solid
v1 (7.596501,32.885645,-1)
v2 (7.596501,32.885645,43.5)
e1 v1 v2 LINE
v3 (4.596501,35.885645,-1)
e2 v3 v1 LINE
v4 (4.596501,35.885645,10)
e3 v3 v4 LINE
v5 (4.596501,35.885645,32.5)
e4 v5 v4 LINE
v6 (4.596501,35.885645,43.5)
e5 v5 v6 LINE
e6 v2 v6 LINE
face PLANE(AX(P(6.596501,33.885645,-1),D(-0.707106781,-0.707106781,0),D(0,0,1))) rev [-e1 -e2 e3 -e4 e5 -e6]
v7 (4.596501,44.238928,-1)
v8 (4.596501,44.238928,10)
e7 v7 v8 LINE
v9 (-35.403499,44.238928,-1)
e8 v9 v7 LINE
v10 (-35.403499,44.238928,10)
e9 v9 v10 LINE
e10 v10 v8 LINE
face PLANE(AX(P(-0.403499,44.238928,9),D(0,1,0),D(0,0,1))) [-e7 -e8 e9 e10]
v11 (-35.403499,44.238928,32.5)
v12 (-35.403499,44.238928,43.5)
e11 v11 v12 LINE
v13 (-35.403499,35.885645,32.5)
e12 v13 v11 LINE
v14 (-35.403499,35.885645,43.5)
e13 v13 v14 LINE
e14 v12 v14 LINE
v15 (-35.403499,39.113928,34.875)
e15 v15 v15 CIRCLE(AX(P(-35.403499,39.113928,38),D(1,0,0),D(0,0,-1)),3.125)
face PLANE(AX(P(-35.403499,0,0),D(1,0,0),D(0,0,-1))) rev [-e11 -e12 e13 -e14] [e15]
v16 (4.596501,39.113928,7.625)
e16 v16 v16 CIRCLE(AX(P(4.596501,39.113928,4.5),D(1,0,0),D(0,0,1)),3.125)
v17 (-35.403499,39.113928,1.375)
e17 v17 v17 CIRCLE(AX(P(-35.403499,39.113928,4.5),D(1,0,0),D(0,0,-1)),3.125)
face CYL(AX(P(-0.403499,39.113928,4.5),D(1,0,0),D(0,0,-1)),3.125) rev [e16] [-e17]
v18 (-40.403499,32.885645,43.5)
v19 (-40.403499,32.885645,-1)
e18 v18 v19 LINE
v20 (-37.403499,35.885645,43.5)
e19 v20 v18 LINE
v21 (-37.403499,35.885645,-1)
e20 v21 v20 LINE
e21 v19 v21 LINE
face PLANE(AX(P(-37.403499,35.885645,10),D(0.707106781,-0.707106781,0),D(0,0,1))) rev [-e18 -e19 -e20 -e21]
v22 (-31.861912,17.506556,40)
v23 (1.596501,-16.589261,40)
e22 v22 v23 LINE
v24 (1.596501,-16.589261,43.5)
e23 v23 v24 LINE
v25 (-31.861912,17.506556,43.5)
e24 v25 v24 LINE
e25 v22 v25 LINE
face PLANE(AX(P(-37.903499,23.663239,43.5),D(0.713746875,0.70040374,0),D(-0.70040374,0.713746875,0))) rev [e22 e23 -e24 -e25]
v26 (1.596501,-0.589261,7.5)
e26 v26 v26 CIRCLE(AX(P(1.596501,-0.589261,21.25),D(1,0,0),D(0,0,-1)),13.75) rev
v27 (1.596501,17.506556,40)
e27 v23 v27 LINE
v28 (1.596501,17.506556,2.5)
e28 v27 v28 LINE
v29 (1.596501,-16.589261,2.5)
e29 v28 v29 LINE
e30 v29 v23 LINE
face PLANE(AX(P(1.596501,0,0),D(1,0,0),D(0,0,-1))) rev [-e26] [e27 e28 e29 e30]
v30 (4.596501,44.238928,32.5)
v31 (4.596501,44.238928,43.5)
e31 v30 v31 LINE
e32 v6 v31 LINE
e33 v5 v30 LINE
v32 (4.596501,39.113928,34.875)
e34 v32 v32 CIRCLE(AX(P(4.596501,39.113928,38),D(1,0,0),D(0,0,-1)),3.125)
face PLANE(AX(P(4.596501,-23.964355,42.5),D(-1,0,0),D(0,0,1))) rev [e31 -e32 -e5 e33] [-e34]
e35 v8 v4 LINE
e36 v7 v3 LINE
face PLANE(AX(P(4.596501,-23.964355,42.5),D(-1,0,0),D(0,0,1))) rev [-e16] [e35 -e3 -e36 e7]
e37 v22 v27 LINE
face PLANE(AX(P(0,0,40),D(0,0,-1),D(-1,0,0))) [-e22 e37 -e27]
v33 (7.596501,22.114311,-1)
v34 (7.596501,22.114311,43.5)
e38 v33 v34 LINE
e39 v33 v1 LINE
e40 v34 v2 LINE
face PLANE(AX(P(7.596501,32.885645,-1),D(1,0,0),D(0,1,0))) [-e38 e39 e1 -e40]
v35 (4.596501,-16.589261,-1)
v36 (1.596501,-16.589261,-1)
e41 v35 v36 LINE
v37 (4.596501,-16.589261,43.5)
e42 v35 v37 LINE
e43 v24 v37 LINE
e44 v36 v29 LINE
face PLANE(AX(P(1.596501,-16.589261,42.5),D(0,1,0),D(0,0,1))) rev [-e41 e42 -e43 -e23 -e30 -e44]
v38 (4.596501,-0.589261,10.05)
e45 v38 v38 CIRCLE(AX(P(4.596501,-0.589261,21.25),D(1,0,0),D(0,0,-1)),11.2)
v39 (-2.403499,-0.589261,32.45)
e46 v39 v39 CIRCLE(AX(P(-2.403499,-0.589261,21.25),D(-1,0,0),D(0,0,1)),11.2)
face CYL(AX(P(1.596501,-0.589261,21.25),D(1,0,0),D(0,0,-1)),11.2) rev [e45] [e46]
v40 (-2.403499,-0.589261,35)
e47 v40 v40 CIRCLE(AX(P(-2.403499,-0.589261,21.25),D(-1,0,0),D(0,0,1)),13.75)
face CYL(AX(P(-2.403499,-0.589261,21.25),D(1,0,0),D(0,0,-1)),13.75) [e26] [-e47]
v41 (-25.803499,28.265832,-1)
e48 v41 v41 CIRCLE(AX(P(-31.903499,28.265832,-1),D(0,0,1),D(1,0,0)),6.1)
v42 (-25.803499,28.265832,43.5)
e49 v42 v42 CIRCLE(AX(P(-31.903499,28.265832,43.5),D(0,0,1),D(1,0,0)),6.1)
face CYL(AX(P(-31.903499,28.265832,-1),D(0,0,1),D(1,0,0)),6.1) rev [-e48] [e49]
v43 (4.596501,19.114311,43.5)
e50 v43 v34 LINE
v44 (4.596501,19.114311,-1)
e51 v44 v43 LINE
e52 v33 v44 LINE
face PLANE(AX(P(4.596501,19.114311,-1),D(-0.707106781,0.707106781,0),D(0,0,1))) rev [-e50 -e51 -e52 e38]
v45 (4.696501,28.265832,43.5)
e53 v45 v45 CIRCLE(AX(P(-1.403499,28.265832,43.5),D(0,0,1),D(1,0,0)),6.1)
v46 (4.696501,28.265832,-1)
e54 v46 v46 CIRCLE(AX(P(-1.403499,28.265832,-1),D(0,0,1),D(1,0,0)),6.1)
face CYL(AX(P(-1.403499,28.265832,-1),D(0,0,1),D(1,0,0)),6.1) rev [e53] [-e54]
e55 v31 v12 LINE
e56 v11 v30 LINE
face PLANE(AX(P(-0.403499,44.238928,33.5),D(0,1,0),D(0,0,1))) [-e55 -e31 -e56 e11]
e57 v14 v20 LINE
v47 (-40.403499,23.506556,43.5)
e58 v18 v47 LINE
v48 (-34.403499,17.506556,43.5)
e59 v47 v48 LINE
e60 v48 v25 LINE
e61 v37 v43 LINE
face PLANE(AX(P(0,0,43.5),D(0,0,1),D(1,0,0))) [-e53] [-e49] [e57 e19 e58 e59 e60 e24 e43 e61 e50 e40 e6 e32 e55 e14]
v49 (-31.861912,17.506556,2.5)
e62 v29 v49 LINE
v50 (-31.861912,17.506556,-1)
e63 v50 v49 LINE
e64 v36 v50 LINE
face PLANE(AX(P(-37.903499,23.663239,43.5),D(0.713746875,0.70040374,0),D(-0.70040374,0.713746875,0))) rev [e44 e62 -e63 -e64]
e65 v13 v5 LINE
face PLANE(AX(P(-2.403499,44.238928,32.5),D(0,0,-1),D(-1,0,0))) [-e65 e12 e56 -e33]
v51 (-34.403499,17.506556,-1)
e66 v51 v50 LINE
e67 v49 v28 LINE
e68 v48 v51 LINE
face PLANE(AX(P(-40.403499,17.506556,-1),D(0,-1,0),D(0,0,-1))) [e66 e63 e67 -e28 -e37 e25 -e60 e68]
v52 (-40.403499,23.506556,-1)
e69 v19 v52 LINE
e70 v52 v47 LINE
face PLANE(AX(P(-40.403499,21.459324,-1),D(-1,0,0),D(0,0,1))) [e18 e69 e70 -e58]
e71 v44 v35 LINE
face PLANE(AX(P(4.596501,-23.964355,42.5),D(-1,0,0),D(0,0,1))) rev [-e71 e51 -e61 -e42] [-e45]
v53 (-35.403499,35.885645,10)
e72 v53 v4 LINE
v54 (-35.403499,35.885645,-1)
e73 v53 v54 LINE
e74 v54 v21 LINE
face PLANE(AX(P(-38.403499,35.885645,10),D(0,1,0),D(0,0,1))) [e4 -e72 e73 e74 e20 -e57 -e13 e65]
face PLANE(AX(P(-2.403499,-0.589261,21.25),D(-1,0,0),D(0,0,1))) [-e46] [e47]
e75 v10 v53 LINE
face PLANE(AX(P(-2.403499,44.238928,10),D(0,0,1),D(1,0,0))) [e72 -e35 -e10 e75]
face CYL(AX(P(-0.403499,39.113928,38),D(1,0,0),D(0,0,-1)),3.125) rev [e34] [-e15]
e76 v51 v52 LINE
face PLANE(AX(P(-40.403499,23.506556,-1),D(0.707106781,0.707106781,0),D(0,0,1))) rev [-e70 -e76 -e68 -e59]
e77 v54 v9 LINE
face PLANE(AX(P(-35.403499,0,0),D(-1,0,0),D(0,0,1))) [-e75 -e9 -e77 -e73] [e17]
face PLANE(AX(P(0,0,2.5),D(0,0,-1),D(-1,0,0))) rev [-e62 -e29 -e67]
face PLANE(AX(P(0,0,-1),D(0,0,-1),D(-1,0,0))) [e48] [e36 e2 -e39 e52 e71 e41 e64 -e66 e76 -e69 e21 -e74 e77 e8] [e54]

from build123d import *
from build123d.topology import SkipClean

# Parameters (mm, degrees)
SKETCH1_W            = 42.5
SKETCH1_H            = 55.85
BOSS_EXTRUDE2_DEPTH  = 42.5
SKETCH5_R            = 3.175
CUT_EXTRUDE2_DEPTH   = 42.5
SKETCH6_W            = 42.5
SKETCH6_H            = 42.5
CUT_EXTRUDE3_DEPTH   = 39.5
SKETCH7_R            = 12
SKETCH7_R_2          = 1.5
CUT_EXTRUDE4_DEPTH   = 39.5
SKETCH9_W            = 10
SKETCH9_H            = 42.5
CUT_EXTRUDE5_DEPTH   = 39.5
CHAMFER1_SIZE        = 3
CHAMFER2_SIZE        = 2
SKETCH10_W           = 2
SKETCH10_H           = 2.12759362
BOSS_EXTRUDE3_DEPTH  = 3
SKETCH12_W           = 2
SKETCH12_H           = 3
BOSS_EXTRUDE4_DEPTH  = 3
BOSS_EXTRUDE5_DEPTH  = 2
BOSS_EXTRUDE6_DEPTH  = 2
SKETCH16_W           = 9
SKETCH16_H           = 14.17
SKETCH16_R           = 3.125
BOSS_EXTRUDE8_DEPTH  = 5
SKETCH18_W           = 9
SKETCH18_H           = 12.353282928
BOSS_EXTRUDE9_DEPTH  = 2
SKETCH20_W           = 36.5
SKETCH20_H           = 45.261647475
CUT_EXTRUDE9_DEPTH   = 66
CUT_EXTRUDE10_DEPTH  = 66
SKETCH22_R           = 12.5
SKETCH22_R_2         = 11.2
SKETCH22_R_3         = 2
BOSS_EXTRUDE13_DEPTH = 3
SKETCH23_W           = 42.5
SKETCH23_H           = 7.37509362
CUT_EXTRUDE11_DEPTH  = 3
CHAMFER3_SIZE        = 2
SKETCH24_R           = 13.75
SKETCH24_R_2         = 11.2
BOSS_EXTRUDE14_DEPTH = 4
BOSS_EXTRUDE15_DEPTH = 2.5
BOSS_EXTRUDE16_DEPTH = 2.5
SKETCH28_W           = 3
SKETCH28_H           = 2
BOSS_EXTRUDE17_DEPTH = 42.5
SKETCH29_W           = 1
SKETCH29_H           = 12.353282928
BOSS_EXTRUDE18_DEPTH = 7
BOSS_EXTRUDE19_START = 1
SKETCH31_R           = 3.175
BOSS_EXTRUDE19_DEPTH = 1
SKETCH32_R           = 3.175
BOSS_EXTRUDE20_DEPTH = 1
BOSS_EXTRUDE21_DEPTH = 1
SKETCH34_W           = 11
SKETCH34_H           = 8.5
SKETCH34_R           = 3.125
SKETCH34_H_2         = 13.67
BOSS_EXTRUDE22_DEPTH = 40
SKETCH35_R           = 3.125
CUT_EXTRUDE13_DEPTH  = 52
BOSS_EXTRUDE23_DEPTH = 11
SKETCH37_W           = 22.5
SKETCH37_H           = 4
BOSS_EXTRUDE24_DEPTH = 43
SKETCH38_W           = 3.111297042
SKETCH38_H           = 14.426321109
BOSS_EXTRUDE25_DEPTH = 44.5
SKETCH39_W           = 1.127935157
SKETCH39_H           = 1.723234268
BOSS_EXTRUDE26_DEPTH = 44.5
BOSS_EXTRUDE27_DEPTH = 44.5
SKETCH42_W           = 2
SKETCH42_H           = 16.771333713
BOSS_EXTRUDE28_DEPTH = 44.5
CHAMFER4_SIZE        = 2
CHAMFER5_SIZE        = 3
SKETCH40_R           = 6.1
CUT_EXTRUDE14_DEPTH  = 44.5
CHAMFER6_SIZE        = 6
SKETCH44_W           = 37.5
SKETCH44_H           = 3.156682669
BOSS_EXTRUDE32_DEPTH = 38.5
SKETCH45_W           = 2.465771705
SKETCH45_H           = 2.227148637
BOSS_EXTRUDE33_DEPTH = 44.5
BOSS_EXTRUDE34_DEPTH = 44.5


with BuildPart() as part:
    # Sketch1 → Boss-Extrude2 (new body)
    with BuildSketch(Plane.XY):
        with Locations((-16.653499003, 3.960644895)):
            Rectangle(SKETCH1_W, SKETCH1_H)
    extrude(amount=BOSS_EXTRUDE2_DEPTH)

    # Sketch5 → Cut-Extrude2 (cut)
    with BuildSketch(Plane.XY.offset(42.5)):
        with Locations((-31.903499003, 25.965832134)):
            Circle(SKETCH5_R)
        with Locations(Location((-1.403499003, 25.965832134, 0), (0, 0, 180))):
            Circle(SKETCH5_R)
    extrude(amount=-CUT_EXTRUDE2_DEPTH, mode=Mode.SUBTRACT)

    # Sketch6 → Cut-Extrude3 (cut)
    with BuildSketch(Plane.ZY.offset(37.903499003)):
        with Locations((21.25, -0.586761485)):
            Rectangle(SKETCH6_W, SKETCH6_H)
    extrude(amount=-CUT_EXTRUDE3_DEPTH, mode=Mode.SUBTRACT)

    # Sketch7 → Cut-Extrude4 (cut)
    with BuildSketch(Plane(origin=(4.596500997, 0, 0), x_dir=(0, 0, -1), z_dir=(1, 0, 0))):
        with Locations((-21.25, -0.586761485)):
            Circle(SKETCH7_R)
        with Locations((-37, -16.336761485)):
            Circle(SKETCH7_R_2)
        with Locations((-5.5, -16.336761485)):
            Circle(SKETCH7_R_2)
        with Locations((-37, 14.663238515)):
            Circle(SKETCH7_R_2)
        with Locations((-5.5, 14.663238515)):
            Circle(SKETCH7_R_2)
    extrude(amount=-CUT_EXTRUDE4_DEPTH, mode=Mode.SUBTRACT)

    # Sketch9 → Cut-Extrude5 (cut)
    with BuildSketch(Plane.XZ.offset(23.964355105)):
        with Locations((-32.903499003, 21.25)):
            Rectangle(SKETCH9_W, SKETCH9_H)
    extrude(amount=-CUT_EXTRUDE5_DEPTH, mode=Mode.SUBTRACT)

    # Chamfer1
    chamfer1_edges = [part.edges().sort_by_distance(p)[0] for p in [
        (-37.903499003, 20.663238515, 21.25),
        (-37.903499003, 31.885644895, 21.25),
    ]]
    chamfer(chamfer1_edges, length=CHAMFER1_SIZE)

    # Chamfer2
    chamfer2_edges = [part.edges().sort_by_distance(p)[0] for p in [
        (4.596500997, -23.964355105, 21.25),
    ]]
    chamfer(chamfer2_edges, length=CHAMFER2_SIZE)

    # Sketch10 → Boss-Extrude3 (add)
    with BuildSketch(Plane.ZY.offset(27.903499003)):
        with Locations((43.5, -22.900558295)):
            Rectangle(SKETCH10_W, SKETCH10_H)
        with Locations((-1, -22.900558295)):
            Rectangle(SKETCH10_W, SKETCH10_H)
    extrude(amount=-BOSS_EXTRUDE3_DEPTH)

    # Sketch12 → Boss-Extrude4 (add)
    with BuildSketch(Plane.ZY.offset(-1.596500997)):
        with Locations((43.5, 19.163238515)):
            Rectangle(SKETCH12_W, SKETCH12_H)
        with Locations((-1, 19.163238515)):
            Rectangle(SKETCH12_W, SKETCH12_H)
    extrude(amount=-BOSS_EXTRUDE4_DEPTH)

    # Sketch13 → Boss-Extrude5 (add)
    with BuildSketch(Plane(origin=(0, 0, -2), x_dir=(-1, 0, 0), z_dir=(0, 0, -1))):
        Polygon((-1.596500997, 17.663238515), (24.903499003, -21.836761485), (27.903499003, -21.836761485), (-1.596500997, 20.663238515), align=None)
    extrude(amount=-BOSS_EXTRUDE5_DEPTH)

    # Sketch14 → Boss-Extrude6 (add)
    with BuildSketch(Plane.XY.offset(44.5)):
        Polygon((1.596500997, 17.663238515), (-24.903499003, -21.836761485), (-27.903499003, -21.836761485), (1.596500997, 20.663238515), align=None)
    extrude(amount=-BOSS_EXTRUDE6_DEPTH)

    # Sketch16 → Boss-Extrude8 (add)
    # profile 1 of 2: a face of its own
    with BuildSketch(Plane(origin=(4.596500997, 0, 0), x_dir=(0, 0, -1), z_dir=(1, 0, 0))):
        with Locations((-38, 37.153927823)):
            Rectangle(SKETCH16_W, SKETCH16_H)
        with Locations((-38, 39.113927823)):
            Circle(SKETCH16_R, mode=Mode.SUBTRACT)
    # profile 2 of 2: a face of its own
    with BuildSketch(Plane(origin=(4.596500997, 0, 0), x_dir=(0, 0, -1), z_dir=(1, 0, 0))):
        with Locations((-4.5, 37.153927823)):
            Rectangle(SKETCH16_W, SKETCH16_H)
        with Locations(Location((-4.5, 39.113927823, 0), (0, 0, 180))):
            Circle(SKETCH16_R, mode=Mode.SUBTRACT)
    extrude(amount=-BOSS_EXTRUDE8_DEPTH)

    # Sketch18 → Boss-Extrude9 (add)
    with BuildSketch(Plane.ZY.offset(0.403499003)):
        with Locations((4.5, 38.062286359)):
            Rectangle(SKETCH18_W, SKETCH18_H)
        with Locations((38, 38.062286359)):
            Rectangle(SKETCH18_W, SKETCH18_H)
    extrude(amount=BOSS_EXTRUDE9_DEPTH)

    # Sketch20 → Cut-Extrude9 (cut, symmetric)
    with BuildSketch(Plane.XY.offset(42.5)):
        with Locations((-16.653499003, -1.967585223)):
            Rectangle(SKETCH20_W, SKETCH20_H)
    extrude(amount=CUT_EXTRUDE9_DEPTH, both=True, mode=Mode.SUBTRACT)

    # Sketch21 → Cut-Extrude10 (cut, symmetric)
    with BuildSketch(Plane(origin=(4.596500997, 0, 0), x_dir=(0, 0, -1), z_dir=(1, 0, 0))):
        Polygon((0, 44.238927823), (0, -21.964355105), (2.461652374, -21.964355105), (3.037977258, 44.238927823), (0.568013469, 44.238927823), align=None)
        Polygon((-42.5, 44.238927823), (-42.5, -21.964355105), (-44.961652374, -21.964355105), (-45.537977258, 44.238927823), (-43.068013469, 44.238927823), align=None)
    extrude(amount=CUT_EXTRUDE10_DEPTH, both=True, mode=Mode.SUBTRACT)

    # Sketch22 → Boss-Extrude13 (add)
    # profile 1 of 5: a face of its own
    with BuildSketch(Plane(origin=(4.596500997, 0, 0), x_dir=(0, 0, -1), z_dir=(1, 0, 0))):
        with Locations((-21.25, -0.499261485)):
            Circle(SKETCH22_R)
        with Locations((-21.25, -0.589261485)):
            Circle(SKETCH22_R_2, mode=Mode.SUBTRACT)
    # profile 2 of 5: a face of its own
    with BuildSketch(Plane(origin=(4.596500997, 0, 0), x_dir=(0, 0, -1), z_dir=(1, 0, 0))):
        with Locations((-37, 14.663238515)):
            Circle(SKETCH22_R_3)
    # profile 3 of 5: a face of its own
    with BuildSketch(Plane(origin=(4.596500997, 0, 0), x_dir=(0, 0, -1), z_dir=(1, 0, 0))):
        with Locations((-5.524563877, 14.750738515)):
            Circle(SKETCH22_R_3)
    # profile 4 of 5: a face of its own
    with BuildSketch(Plane(origin=(4.596500997, 0, 0), x_dir=(0, 0, -1), z_dir=(1, 0, 0))):
        with Locations((-5.5, -16.336761485)):
            Circle(SKETCH22_R_3)
    # profile 5 of 5: a face of its own
    with BuildSketch(Plane(origin=(4.596500997, 0, 0), x_dir=(0, 0, -1), z_dir=(1, 0, 0))):
        with Locations((-37, -16.336761485)):
            Circle(SKETCH22_R_3)
    extrude(amount=-BOSS_EXTRUDE13_DEPTH)

    # Sketch23 → Cut-Extrude11 (cut)
    with BuildSketch(Plane(origin=(4.596500997, 0, 0), x_dir=(0, 0, -1), z_dir=(1, 0, 0))):
        with Locations((-21.25, -20.276808295)):
            Rectangle(SKETCH23_W, SKETCH23_H)
    extrude(amount=-CUT_EXTRUDE11_DEPTH, mode=Mode.SUBTRACT)

    # Chamfer3
    chamfer3_edges = [part.edges().sort_by_distance(p)[0] for p in [
        (4.596500997, -16.589261485, 21.25),
    ]]
    chamfer(chamfer3_edges, length=CHAMFER3_SIZE)

    # Sketch24 → Boss-Extrude14 (add)
    with BuildSketch(Plane.ZY.offset(-1.596500997)):
        with Locations(Location((21.25, -0.589261485, 0), (0, 0, 180))):
            Circle(SKETCH24_R)
        with Locations(Location((21.25, -0.589261485, 0), (0, 0, 180))):
            Circle(SKETCH24_R_2, mode=Mode.SUBTRACT)
    extrude(amount=BOSS_EXTRUDE14_DEPTH)

    # Sketch25 → Boss-Extrude15 (add)
    with BuildSketch(Plane.XY.offset(42.5)):
        Polygon((-34.903499003, 20.663238515), (1.596500997, -16.589261485), (1.596500997, 20.663238515), align=None)
    extrude(amount=-BOSS_EXTRUDE15_DEPTH)

    # Sketch26 → Boss-Extrude16 (add)
    with BuildSketch(Plane(origin=(0, 0, 0), x_dir=(-1, 0, 0), z_dir=(0, 0, -1))):
        Polygon((-1.596500997, 20.663238515), (-1.596500997, -16.589261485), (34.903499003, 20.663238515), align=None)
    extrude(amount=-BOSS_EXTRUDE16_DEPTH)

    # Sketch28 → Boss-Extrude17 (add)
    with BuildSketch(Plane.XY.offset(42.5)):
        with Locations((3.096500997, -15.589261485)):
            Rectangle(SKETCH28_W, SKETCH28_H)
    extrude(amount=-BOSS_EXTRUDE17_DEPTH)

    # Sketch29 → Boss-Extrude18 (add)
    with BuildSketch(Plane(origin=(4.596500997, 0, 0), x_dir=(0, 0, -1), z_dir=(1, 0, 0))):
        with Locations((-33, 38.062286359)):
            Rectangle(SKETCH29_W, SKETCH29_H)
        with Locations((-9.5, 38.062286359)):
            Rectangle(SKETCH29_W, SKETCH29_H)
    extrude(amount=-BOSS_EXTRUDE18_DEPTH)

    # Sketch31 → Boss-Extrude19 (add)
    with BuildSketch(Plane.XY.offset(42.5).offset(BOSS_EXTRUDE19_START)):
        Polygon((-37.903499003, 28.885644895), (-37.903499003, 23.663238515), (1.596500997, -16.589261485), (4.596500997, -16.589261485), (4.596500997, 44.238927823), (-2.403499003, 44.238927823), (-2.403499003, 31.885644895), (-34.903499003, 31.885644895), align=None)
        with Locations((-31.903499003, 25.965832134)):
            Circle(SKETCH31_R, mode=Mode.SUBTRACT)
        with Locations((-1.403499003, 25.965832134)):
            Circle(SKETCH31_R, mode=Mode.SUBTRACT)
    extrude(amount=-BOSS_EXTRUDE19_DEPTH)

    # Sketch32 → Boss-Extrude20 (add)
    with BuildSketch(Plane(origin=(0, 0, 0), x_dir=(-1, 0, 0), z_dir=(0, 0, -1))):
        Polygon((-4.596500997, 44.238927823), (-4.596500997, -16.589261485), (-1.596500997, -16.589261485), (37.903499003, 23.663238515), (37.903499003, 28.885644895), (34.903499003, 31.885644895), (2.403499003, 31.885644895), (2.403499003, 44.238927823), align=None)
        with Locations(Location((1.403499003, 25.965832134, 0), (0, 0, 180))):
            Circle(SKETCH32_R, mode=Mode.SUBTRACT)
        with Locations(Location((31.903499003, 25.965832134, 0), (0, 0, 180))):
            Circle(SKETCH32_R, mode=Mode.SUBTRACT)
    extrude(amount=BOSS_EXTRUDE20_DEPTH)

    # Sketch33 → Boss-Extrude21 (add)
    with BuildSketch(Plane(origin=(-7.479841124, -7.340009301, 0), x_dir=(0, 0, 1), z_dir=(-0.7137468745682252, -0.7004037400272006, 0))):
        Polygon((-1, 43.437314994), (-1, -12.958728806), (2.5, -12.958728806), (2.5, 39.19486315), (40, 39.19486315), (40, -12.958728806), (43.5, -12.958728806), (43.5, 43.437314994), align=None)
    extrude(amount=-BOSS_EXTRUDE21_DEPTH)

    # Sketch34 → Boss-Extrude22 (add)
    # profile 1 of 2: a face of its own
    with BuildSketch(Plane(origin=(4.596500997, 0, 0), x_dir=(0, 0, -1), z_dir=(1, 0, 0))):
        with Locations((-38, 39.988927823)):
            Rectangle(SKETCH34_W, SKETCH34_H)
        with Locations((-38, 39.113927823)):
            Circle(SKETCH34_R, mode=Mode.SUBTRACT)
    # profile 2 of 2: a face of its own
    with BuildSketch(Plane(origin=(4.596500997, 0, 0), x_dir=(0, 0, -1), z_dir=(1, 0, 0))):
        with Locations((-4.5, 37.403927823)):
            Rectangle(SKETCH34_W, SKETCH34_H_2)
        with Locations(Location((-4.5, 39.113927823, 0), (0, 0, 180))):
            Circle(SKETCH34_R, mode=Mode.SUBTRACT)
    extrude(amount=-BOSS_EXTRUDE22_DEPTH)

    # Sketch35 → Cut-Extrude13 (cut)
    with BuildSketch(Plane(origin=(4.596500997, 0, 0), x_dir=(0, 0, -1), z_dir=(1, 0, 0))):
        with Locations((-38, 39.113927823)):
            Circle(SKETCH35_R)
        with Locations((-4.5, 39.113927823)):
            Circle(SKETCH35_R)
    extrude(amount=-CUT_EXTRUDE13_DEPTH, mode=Mode.SUBTRACT)

    # Sketch36 → Boss-Extrude23 (add)
    with BuildSketch(Plane.XY.offset(43.5)):
        Polygon((-35.403499003, 35.738927823), (-35.403499003, 31.385644895), (-34.903499003, 31.885644895), (-2.403499003, 31.885644895), (-2.403499003, 35.738927823), align=None)
    extrude(amount=-BOSS_EXTRUDE23_DEPTH)

    # Sketch37 → Boss-Extrude24 (add)
    with BuildSketch(Plane(origin=(4.596500997, 0, 0), x_dir=(0, 0, -1), z_dir=(1, 0, 0))):
        with Locations((-21.25, 33.885644895)):
            Rectangle(SKETCH37_W, SKETCH37_H)
    extrude(amount=-BOSS_EXTRUDE24_DEPTH)

    # Sketch38 → Boss-Extrude25 (add)
    with BuildSketch(Plane.XY.offset(43.5)):
        with Locations((-36.847850482, 28.672484341)):
            Rectangle(SKETCH38_W, SKETCH38_H)
    extrude(amount=-BOSS_EXTRUDE25_DEPTH)

    # Sketch39 → Boss-Extrude26 (add)
    with BuildSketch(Plane(origin=(0, 0, -1), x_dir=(-1, 0, 0), z_dir=(0, 0, -1))):
        with Locations((35.21666709, 31.599834129)):
            Rectangle(SKETCH39_W, SKETCH39_H)
    extrude(amount=-BOSS_EXTRUDE26_DEPTH)

    # Sketch41 → Boss-Extrude27 (add)
    with BuildSketch(Plane.XY.offset(43.5)):
        Polygon((-38.403499003, 35.885644895), (-40.403499003, 35.885644895), (-40.403499003, 21.459323786), (-40.403499003, 17.506555846), (-31.861912383, 17.506555846), (-35.740785337, 21.459323786), (-38.403499003, 21.459323786), align=None)
    extrude(amount=-BOSS_EXTRUDE27_DEPTH)

    # Sketch42 → Boss-Extrude28 (add)
    with BuildSketch(Plane.XY.offset(43.5)):
        with Locations((5.596500997, 27.499978039)):
            Rectangle(SKETCH42_W, SKETCH42_H)
    extrude(amount=-BOSS_EXTRUDE28_DEPTH)

    # Chamfer4
    chamfer4_edges = [part.edges().sort_by_distance(p)[0] for p in [
        (6.596500997, 19.114311182, 21.25),
        (6.596500997, 35.885644895, 21.25),
    ]]
    chamfer(chamfer4_edges, length=CHAMFER4_SIZE - 0.0001)  # a hair under: the kernel refuses the full size

    # Chamfer5
    chamfer5_edges = [part.edges().sort_by_distance(p)[0] for p in [
        (-40.403499003, 35.885644895, 21.25),
    ]]
    chamfer(chamfer5_edges, length=CHAMFER5_SIZE)

    # Sketch40 → Cut-Extrude14 (cut)
    with BuildSketch(Plane.XY.offset(43.5)):
        with Locations((-31.903499003, 28.265832134)):
            Circle(SKETCH40_R)
        with Locations((-1.403499003, 28.265832134)):
            Circle(SKETCH40_R)
    extrude(amount=-CUT_EXTRUDE14_DEPTH, mode=Mode.SUBTRACT)

    # Chamfer6
    chamfer6_edges = [part.edges().sort_by_distance(p)[0] for p in [
        (-40.403499003, 17.506555846, 21.25),
    ]]
    chamfer(chamfer6_edges, length=CHAMFER6_SIZE)

    # Sketch44 → Boss-Extrude32 (add)
    with BuildSketch(Plane(origin=(4.596500997, 0, 0), x_dir=(0, 0, -1), z_dir=(1, 0, 0))):
        with Locations((-21.25, 19.084897181)):
            Rectangle(SKETCH44_W, SKETCH44_H)
    extrude(amount=-BOSS_EXTRUDE32_DEPTH)

    # Sketch45 → Boss-Extrude33 (add)
    with BuildSketch(Plane.XY.offset(43.5)):
        with Locations((-34.362753496, 20.148344478)):
            Rectangle(SKETCH45_W, SKETCH45_H)
    extrude(amount=-BOSS_EXTRUDE33_DEPTH)

    # Sketch47 → Boss-Extrude34 (add)
    with SkipClean():  # the faces are left unmerged after this step: merging them gives an invalid solid
        with BuildSketch(Plane.XY.offset(43.5)):
            Polygon((6.596500997, 33.885644895), (7.596500997, 32.885644895), (7.596500997, 22.114311182), (6.596500997, 21.114311182), align=None)
        extrude(amount=-BOSS_EXTRUDE34_DEPTH)


solid = part.part
